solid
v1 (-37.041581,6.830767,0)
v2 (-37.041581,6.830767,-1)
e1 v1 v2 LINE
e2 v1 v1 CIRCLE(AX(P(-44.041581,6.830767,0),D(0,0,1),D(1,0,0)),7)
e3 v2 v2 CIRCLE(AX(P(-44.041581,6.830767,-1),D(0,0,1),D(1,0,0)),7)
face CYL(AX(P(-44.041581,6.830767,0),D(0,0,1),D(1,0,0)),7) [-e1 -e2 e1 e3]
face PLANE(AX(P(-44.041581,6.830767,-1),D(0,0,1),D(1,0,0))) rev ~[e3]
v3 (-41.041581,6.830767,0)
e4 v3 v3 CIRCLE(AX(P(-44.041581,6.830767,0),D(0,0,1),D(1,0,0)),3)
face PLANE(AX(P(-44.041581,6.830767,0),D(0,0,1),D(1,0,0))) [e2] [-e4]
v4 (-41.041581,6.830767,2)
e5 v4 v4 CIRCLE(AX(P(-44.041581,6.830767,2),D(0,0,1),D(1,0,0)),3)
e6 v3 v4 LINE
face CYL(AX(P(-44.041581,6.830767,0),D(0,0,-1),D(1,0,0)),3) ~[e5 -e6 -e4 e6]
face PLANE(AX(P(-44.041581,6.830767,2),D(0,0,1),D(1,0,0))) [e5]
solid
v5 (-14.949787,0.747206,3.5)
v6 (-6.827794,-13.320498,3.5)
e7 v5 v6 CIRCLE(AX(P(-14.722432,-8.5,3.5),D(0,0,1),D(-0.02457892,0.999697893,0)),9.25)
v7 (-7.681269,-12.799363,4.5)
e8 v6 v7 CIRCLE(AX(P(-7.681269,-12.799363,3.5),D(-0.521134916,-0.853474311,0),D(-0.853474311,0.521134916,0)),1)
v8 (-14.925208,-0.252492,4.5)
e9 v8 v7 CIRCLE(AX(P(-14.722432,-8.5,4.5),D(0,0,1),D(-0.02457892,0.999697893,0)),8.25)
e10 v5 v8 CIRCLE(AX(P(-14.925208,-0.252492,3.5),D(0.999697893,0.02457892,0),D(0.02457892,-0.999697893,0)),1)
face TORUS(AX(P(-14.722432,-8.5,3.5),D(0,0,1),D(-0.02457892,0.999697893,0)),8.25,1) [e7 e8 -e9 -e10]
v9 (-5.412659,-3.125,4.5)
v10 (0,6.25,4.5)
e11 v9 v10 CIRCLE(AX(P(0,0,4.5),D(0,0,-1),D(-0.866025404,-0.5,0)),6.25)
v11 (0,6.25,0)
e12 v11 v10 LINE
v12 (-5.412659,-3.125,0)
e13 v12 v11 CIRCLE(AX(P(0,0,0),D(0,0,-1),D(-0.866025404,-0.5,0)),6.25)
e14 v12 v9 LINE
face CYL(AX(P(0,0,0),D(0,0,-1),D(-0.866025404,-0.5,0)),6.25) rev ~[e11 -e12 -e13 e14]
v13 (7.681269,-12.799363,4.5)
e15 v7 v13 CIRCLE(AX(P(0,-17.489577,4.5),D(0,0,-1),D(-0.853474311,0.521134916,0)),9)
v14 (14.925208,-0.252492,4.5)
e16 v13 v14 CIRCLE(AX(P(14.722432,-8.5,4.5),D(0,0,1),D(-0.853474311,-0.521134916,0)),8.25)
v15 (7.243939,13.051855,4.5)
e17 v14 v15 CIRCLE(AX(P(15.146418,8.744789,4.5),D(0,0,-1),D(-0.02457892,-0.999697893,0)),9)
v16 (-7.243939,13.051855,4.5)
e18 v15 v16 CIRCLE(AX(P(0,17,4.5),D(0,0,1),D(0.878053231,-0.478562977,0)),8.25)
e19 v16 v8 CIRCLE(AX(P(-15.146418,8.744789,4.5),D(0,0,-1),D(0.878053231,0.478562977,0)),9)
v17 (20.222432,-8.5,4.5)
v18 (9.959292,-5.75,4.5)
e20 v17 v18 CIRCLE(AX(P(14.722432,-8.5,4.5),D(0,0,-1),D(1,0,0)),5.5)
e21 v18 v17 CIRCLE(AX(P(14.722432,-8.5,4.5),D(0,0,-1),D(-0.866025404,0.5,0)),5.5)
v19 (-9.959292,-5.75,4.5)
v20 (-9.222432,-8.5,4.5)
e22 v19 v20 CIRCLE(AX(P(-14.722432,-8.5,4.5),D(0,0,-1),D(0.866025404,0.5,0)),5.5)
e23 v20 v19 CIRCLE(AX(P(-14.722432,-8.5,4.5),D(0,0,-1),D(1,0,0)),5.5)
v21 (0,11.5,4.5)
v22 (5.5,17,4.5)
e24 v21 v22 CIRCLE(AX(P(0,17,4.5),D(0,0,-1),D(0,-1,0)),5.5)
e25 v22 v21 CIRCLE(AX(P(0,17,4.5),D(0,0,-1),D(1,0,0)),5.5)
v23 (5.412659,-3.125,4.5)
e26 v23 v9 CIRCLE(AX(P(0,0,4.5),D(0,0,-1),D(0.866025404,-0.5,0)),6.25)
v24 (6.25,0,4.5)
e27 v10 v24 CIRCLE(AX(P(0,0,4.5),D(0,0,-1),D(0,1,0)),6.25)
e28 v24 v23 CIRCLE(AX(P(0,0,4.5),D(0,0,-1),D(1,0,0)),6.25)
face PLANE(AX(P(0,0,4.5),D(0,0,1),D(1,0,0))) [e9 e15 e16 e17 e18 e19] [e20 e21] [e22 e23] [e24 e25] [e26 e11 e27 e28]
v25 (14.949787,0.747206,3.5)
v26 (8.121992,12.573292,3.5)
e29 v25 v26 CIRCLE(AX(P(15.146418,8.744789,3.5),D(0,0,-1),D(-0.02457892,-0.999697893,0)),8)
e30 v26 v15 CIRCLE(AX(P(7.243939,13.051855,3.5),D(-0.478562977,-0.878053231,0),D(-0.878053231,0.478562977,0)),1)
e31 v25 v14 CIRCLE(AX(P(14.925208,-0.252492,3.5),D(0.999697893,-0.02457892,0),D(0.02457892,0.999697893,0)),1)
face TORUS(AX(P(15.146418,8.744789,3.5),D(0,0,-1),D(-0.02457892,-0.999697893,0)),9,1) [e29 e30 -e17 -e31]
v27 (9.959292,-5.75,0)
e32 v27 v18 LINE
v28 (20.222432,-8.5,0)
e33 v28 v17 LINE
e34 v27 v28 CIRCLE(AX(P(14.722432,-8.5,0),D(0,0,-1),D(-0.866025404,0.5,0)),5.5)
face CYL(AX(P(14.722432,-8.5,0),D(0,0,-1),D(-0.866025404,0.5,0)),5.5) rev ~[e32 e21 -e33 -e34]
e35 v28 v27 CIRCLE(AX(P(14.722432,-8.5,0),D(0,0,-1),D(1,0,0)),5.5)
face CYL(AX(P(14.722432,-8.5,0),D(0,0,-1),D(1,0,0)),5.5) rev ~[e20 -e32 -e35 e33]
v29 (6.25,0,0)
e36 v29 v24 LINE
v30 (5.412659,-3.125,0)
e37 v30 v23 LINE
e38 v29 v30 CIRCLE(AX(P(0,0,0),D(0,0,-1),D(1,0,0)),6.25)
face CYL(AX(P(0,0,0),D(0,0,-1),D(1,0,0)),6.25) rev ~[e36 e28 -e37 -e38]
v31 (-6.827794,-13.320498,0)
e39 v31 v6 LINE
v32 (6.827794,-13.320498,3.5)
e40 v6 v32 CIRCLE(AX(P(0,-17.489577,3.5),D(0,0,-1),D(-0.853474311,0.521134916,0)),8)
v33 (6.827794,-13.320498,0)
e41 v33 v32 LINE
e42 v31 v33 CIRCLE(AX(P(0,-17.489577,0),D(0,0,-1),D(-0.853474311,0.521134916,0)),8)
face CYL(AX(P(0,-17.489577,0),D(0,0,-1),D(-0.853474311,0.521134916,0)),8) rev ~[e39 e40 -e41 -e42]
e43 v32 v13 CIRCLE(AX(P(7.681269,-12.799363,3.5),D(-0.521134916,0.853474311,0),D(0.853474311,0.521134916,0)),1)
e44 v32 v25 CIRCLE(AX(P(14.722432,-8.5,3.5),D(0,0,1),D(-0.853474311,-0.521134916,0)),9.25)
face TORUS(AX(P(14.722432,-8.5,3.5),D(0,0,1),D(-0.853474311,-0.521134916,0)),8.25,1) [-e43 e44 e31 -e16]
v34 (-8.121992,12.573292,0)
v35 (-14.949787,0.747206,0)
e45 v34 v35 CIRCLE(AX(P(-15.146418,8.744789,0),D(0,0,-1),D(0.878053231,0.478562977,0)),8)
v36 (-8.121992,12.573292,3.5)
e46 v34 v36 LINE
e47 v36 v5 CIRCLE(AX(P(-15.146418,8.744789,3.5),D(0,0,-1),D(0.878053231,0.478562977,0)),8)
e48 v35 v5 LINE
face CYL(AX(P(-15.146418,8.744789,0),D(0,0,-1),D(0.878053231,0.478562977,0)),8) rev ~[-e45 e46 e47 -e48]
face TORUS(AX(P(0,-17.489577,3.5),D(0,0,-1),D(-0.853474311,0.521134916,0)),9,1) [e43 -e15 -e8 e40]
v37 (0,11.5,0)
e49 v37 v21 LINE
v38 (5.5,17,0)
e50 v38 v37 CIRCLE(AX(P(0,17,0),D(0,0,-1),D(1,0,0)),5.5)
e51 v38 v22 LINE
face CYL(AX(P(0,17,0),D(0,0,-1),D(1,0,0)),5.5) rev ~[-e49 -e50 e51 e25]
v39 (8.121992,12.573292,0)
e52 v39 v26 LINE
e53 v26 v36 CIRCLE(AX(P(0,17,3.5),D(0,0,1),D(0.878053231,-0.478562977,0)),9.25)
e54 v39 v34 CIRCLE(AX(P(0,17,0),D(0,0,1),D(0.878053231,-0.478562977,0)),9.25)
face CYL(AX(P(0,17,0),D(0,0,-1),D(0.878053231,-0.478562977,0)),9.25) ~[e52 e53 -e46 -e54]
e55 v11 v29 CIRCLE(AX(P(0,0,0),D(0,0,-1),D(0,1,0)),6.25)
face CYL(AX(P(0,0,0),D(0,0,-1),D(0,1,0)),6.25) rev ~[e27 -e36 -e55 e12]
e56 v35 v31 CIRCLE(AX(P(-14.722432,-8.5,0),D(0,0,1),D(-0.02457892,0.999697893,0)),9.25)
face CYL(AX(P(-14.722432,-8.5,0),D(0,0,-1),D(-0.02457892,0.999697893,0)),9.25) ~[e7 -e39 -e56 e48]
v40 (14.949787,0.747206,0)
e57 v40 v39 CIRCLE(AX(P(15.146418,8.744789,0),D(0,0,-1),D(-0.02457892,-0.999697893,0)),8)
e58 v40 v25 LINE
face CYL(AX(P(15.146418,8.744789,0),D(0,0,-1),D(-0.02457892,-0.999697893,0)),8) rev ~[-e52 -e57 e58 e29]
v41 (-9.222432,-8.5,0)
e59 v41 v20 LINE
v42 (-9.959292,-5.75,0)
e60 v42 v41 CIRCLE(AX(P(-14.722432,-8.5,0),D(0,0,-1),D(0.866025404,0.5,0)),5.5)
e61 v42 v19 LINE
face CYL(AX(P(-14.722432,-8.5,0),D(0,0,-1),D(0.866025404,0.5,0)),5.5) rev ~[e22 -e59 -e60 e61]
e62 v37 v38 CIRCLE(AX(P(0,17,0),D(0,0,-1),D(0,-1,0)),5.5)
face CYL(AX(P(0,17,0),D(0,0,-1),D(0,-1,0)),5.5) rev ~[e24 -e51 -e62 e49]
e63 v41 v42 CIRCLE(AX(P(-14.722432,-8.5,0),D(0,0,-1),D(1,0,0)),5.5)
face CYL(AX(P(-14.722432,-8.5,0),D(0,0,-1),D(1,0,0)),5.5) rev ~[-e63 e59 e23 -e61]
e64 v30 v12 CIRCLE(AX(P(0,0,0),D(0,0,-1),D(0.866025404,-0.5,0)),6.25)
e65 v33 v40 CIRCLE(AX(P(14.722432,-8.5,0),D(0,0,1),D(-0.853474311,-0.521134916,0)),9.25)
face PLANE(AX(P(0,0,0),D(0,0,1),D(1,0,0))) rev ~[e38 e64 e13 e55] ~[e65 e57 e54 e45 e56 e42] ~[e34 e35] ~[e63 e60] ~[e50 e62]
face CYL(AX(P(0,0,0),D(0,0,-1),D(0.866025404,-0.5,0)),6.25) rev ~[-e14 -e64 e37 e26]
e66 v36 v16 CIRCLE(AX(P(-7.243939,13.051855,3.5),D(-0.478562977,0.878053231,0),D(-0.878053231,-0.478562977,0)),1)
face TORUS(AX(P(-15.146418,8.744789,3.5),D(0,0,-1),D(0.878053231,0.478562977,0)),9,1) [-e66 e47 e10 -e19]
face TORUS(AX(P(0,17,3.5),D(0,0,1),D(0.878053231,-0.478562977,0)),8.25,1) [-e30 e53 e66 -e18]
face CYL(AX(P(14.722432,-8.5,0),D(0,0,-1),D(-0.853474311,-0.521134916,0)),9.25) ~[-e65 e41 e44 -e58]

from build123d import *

# Parameters (mm, degrees)
F1_DEPTH = 4.5
F2_R     = 3
F3_DEPTH = 2
F2_R_2   = 7
F4_DEPTH = 1
F5_R     = 1


with BuildPart() as f1:
    # F0 (on Top) → F1 (new body)
    with BuildSketch(Plane.XY):
        with BuildLine():
            ThreePointArc((14.9497868783, 0.7472055075), (8.2182150114, 4.7447886491), (8.1219923905, 12.573292464))
            ThreePointArc((8.1219923905, 12.573292464), (0, 26.25), (-8.1219923905, 12.573292464))
            ThreePointArc((-8.1219923905, 12.573292464), (-8.2182150114, 4.7447886491), (-14.9497868783, 0.7472055075))
            ThreePointArc((-14.9497868783, 0.7472055075), (-22.7331668493, -13.125), (-6.8277944878, -13.3204979715))
            ThreePointArc((-6.8277944878, -13.3204979715), (0, -9.4895772982), (6.8277944878, -13.3204979715))
            ThreePointArc((6.8277944878, -13.3204979715), (22.7331668493, -13.125), (14.9497868783, 0.7472055075))
        make_face()
        with BuildLine():
            ThreePointArc((-9.2224318643, -8.5), (-20.0350239089, -9.9235047481), (-9.9592921435, -5.75))
            ThreePointArc((-9.9592921435, -5.75), (-9.4098398197, -7.0764952519), (-9.2224318643, -8.5))
        make_face(mode=Mode.SUBTRACT)
        with BuildLine():
            ThreePointArc((0, 6.25), (4.4194173824, 4.4194173824), (6.25, 0))
            ThreePointArc((6.25, 0), (6.0370364143, -1.6176190319), (5.4126587737, -3.125))
            ThreePointArc((5.4126587737, -3.125), (0, -6.25), (-5.4126587737, -3.125))
            ThreePointArc((-5.4126587737, -3.125), (-5.4126587737, 3.125), (0, 6.25))
        make_face(mode=Mode.SUBTRACT)
        with BuildLine():
            ThreePointArc((20.2224318643, -8.5), (13.2989271163, -13.8125920446), (9.9592921435, -5.75))
            ThreePointArc((9.9592921435, -5.75), (16.1459366124, -3.1874079554), (20.2224318643, -8.5))
        make_face(mode=Mode.SUBTRACT)
        with BuildLine():
            ThreePointArc((5.5, 17), (3.8890872965, 13.1109127035), (0, 11.5))
            ThreePointArc((0, 11.5), (-3.8890872965, 20.8890872965), (5.5, 17))
        make_face(mode=Mode.SUBTRACT)
    extrude(amount=F1_DEPTH)

    # F5
    f5_edges = [f1.edges().sort_by_distance(p)[0] for p in [
        (0, -9.489577, 4.5),
        (-22.733167, -13.125, 4.5),
        (-8.218215, 4.744789, 4.5),
        (0, 26.25, 4.5),
        (8.218215, 4.744789, 4.5),
        (22.733167, -13.125, 4.5),
    ]]
    fillet(f5_edges, radius=F5_R)


with BuildPart() as f3:
    # F2 (on Top) → F3 (new body)
    with BuildSketch(Plane.XY):
        with Locations((-44.0415814519, 6.8307667971)):
            Circle(F2_R)
    extrude(amount=F3_DEPTH)

    # F2 (on Top) → F4 (join)
    with BuildSketch(Plane.XY):
        with Locations((-44.0415814519, 6.8307667971)):
            Circle(F2_R_2)
        with Locations((-44.0415814519, 6.8307667971)):
            Circle(F2_R, mode=Mode.SUBTRACT)
        with Locations((-44.0415814519, 6.8307667971)):
            Circle(F2_R)
    extrude(amount=-F4_DEPTH)


solid = Compound([f1.part, f3.part])
